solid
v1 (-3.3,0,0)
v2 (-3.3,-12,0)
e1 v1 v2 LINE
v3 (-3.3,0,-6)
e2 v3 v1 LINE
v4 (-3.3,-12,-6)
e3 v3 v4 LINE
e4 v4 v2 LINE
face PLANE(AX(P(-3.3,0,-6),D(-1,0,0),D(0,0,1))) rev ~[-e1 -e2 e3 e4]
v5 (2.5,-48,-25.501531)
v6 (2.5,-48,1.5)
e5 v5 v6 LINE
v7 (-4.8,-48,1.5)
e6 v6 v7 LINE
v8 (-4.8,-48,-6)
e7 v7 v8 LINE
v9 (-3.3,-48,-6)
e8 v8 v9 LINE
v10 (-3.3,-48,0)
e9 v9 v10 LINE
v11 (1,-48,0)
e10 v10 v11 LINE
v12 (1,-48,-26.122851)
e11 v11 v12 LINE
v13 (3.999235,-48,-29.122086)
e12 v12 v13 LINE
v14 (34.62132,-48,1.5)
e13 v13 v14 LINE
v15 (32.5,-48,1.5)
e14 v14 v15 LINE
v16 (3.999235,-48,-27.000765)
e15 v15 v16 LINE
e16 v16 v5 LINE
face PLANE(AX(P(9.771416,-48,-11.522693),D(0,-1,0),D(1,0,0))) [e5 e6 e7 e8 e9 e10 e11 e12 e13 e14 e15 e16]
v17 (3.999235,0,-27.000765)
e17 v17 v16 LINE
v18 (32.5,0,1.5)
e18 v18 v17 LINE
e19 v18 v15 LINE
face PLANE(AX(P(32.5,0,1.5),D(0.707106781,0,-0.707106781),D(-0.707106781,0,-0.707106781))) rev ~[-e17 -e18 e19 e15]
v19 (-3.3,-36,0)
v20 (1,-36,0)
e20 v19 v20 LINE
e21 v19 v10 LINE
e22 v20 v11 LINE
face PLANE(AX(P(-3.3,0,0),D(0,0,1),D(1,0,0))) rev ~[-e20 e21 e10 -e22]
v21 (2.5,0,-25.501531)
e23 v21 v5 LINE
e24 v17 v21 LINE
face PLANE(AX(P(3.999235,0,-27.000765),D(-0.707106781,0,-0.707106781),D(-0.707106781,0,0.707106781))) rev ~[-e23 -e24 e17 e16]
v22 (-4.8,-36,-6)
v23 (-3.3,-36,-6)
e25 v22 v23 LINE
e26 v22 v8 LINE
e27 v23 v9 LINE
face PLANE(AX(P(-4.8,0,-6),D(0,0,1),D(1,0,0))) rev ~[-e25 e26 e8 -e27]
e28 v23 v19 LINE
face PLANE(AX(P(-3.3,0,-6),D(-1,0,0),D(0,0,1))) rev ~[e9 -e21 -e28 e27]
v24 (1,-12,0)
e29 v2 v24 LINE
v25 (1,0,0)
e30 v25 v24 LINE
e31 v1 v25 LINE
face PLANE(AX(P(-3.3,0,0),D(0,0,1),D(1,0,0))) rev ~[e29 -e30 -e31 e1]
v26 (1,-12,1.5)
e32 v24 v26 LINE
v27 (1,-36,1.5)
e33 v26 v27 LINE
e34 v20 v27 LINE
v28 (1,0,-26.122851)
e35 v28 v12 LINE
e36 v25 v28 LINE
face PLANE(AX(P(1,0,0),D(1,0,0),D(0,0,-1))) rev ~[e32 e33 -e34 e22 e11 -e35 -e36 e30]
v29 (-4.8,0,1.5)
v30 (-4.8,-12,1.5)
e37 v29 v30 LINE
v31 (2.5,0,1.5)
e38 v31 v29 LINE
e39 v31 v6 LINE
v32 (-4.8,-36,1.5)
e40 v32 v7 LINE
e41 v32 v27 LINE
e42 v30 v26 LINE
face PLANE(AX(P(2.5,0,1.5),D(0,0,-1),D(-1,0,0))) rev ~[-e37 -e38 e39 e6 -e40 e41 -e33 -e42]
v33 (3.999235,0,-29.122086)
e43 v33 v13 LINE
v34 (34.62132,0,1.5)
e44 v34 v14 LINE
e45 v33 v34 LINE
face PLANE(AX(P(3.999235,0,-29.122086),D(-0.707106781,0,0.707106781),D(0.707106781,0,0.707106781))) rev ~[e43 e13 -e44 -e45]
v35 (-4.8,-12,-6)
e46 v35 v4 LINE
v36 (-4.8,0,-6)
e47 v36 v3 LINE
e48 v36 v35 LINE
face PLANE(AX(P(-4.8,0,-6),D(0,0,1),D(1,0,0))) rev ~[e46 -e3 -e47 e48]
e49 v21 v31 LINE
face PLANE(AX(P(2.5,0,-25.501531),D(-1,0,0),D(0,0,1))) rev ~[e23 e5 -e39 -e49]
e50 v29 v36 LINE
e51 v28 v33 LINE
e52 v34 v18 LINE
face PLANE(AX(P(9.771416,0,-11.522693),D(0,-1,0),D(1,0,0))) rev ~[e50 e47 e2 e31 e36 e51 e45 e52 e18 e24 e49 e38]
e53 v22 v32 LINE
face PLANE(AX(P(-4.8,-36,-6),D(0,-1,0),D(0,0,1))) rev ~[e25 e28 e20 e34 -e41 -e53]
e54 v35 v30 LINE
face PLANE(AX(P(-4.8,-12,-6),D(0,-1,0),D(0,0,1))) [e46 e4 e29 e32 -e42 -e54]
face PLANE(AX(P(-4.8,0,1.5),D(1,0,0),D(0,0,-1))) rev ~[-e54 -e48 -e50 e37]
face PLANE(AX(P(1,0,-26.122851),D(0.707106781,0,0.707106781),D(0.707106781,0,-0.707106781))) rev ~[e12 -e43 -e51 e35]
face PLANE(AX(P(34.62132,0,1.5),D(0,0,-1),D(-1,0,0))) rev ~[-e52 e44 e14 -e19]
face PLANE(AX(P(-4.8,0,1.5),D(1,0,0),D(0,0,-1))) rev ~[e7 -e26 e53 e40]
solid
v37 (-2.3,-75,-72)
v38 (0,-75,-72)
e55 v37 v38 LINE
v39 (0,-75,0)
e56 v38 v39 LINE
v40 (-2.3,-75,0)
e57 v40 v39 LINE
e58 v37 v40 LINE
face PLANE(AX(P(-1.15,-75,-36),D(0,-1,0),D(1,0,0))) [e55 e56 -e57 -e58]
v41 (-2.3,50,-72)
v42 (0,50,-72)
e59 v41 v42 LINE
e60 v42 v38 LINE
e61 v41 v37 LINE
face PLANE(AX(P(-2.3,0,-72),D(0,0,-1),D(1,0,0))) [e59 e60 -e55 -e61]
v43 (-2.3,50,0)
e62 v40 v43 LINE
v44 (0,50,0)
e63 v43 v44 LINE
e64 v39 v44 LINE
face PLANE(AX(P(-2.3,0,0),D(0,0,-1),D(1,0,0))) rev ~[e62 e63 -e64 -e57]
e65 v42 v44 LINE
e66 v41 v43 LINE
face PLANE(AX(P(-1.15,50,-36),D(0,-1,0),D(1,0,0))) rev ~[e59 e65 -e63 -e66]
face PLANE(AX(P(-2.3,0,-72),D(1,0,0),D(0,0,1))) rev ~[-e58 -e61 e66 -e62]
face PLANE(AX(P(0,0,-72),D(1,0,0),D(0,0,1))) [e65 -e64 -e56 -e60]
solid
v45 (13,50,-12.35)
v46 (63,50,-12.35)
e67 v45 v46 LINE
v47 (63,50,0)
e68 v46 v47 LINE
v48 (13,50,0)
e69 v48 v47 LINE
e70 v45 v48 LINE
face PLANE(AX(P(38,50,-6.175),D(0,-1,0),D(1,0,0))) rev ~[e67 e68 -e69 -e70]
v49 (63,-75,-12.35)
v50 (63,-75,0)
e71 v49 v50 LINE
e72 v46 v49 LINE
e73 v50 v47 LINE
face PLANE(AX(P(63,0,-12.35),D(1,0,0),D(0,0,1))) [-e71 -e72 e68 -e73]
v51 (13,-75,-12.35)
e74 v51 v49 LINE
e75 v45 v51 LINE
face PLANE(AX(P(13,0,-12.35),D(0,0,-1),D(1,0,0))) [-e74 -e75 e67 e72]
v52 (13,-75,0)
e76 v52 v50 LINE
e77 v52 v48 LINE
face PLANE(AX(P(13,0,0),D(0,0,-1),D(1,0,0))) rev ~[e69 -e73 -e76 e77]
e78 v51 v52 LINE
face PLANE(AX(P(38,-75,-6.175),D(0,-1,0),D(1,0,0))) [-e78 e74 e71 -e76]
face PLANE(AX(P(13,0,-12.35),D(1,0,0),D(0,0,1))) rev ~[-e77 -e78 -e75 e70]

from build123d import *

# Parameters (mm, degrees)
F1_W          = 2.3
F1_H          = 72
F2_DEPTH      = 75
F2_DEPTH_BACK = 50
F3_W          = 50
F3_H          = 12.35
F4_DEPTH      = 75
F4_DEPTH_BACK = 50
F6_DEPTH      = 48
F7_W          = 24
F7_H          = 7.5
F8_DEPTH      = 5.8


with BuildPart() as f2:
    # F1 (on Front) → F2 (new body, two sides)
    with BuildSketch(Plane.XZ) as f2_sk:
        with Locations((-1.15, -36)):
            Rectangle(F1_W, F1_H)
    extrude(amount=F2_DEPTH)
    extrude(f2_sk.sketch, amount=-F2_DEPTH_BACK)


with BuildPart() as f4:
    # F3 (on Front) → F4 (new body, two sides)
    with BuildSketch(Plane.XZ) as f4_sk:
        with Locations((38, -6.175)):
            Rectangle(F3_W, F3_H)
    extrude(amount=F4_DEPTH)
    extrude(f4_sk.sketch, amount=-F4_DEPTH_BACK)


with BuildPart() as f6:
    # F5 (on Front) → F6 (new body)
    with BuildSketch(Plane.XZ):
        Polygon((-4.8, 1.5), (-4.8, -6), (-3.3, -6), (-3.3, 0), (1, 0), (1, -26.1228512973), (3.9992345232, -29.1220858204), (34.6213203436, 1.5), (32.5, 1.5), (3.9992345232, -27.0007654768), (2.5, -25.5015309537), (2.5, 1.5), align=None)
    extrude(amount=F6_DEPTH)

    # F7 (on face) → F8 (cut, through all)
    with BuildSketch(Plane(origin=(-4.8, 0, 0), x_dir=(0, -1, 0), z_dir=(-1, 0, 0))):
        with Locations((24, -2.25)):
            Rectangle(F7_W, F7_H)
    extrude(amount=-F8_DEPTH, mode=Mode.SUBTRACT)


solid = Compound([f2.part, f4.part, f6.part])
